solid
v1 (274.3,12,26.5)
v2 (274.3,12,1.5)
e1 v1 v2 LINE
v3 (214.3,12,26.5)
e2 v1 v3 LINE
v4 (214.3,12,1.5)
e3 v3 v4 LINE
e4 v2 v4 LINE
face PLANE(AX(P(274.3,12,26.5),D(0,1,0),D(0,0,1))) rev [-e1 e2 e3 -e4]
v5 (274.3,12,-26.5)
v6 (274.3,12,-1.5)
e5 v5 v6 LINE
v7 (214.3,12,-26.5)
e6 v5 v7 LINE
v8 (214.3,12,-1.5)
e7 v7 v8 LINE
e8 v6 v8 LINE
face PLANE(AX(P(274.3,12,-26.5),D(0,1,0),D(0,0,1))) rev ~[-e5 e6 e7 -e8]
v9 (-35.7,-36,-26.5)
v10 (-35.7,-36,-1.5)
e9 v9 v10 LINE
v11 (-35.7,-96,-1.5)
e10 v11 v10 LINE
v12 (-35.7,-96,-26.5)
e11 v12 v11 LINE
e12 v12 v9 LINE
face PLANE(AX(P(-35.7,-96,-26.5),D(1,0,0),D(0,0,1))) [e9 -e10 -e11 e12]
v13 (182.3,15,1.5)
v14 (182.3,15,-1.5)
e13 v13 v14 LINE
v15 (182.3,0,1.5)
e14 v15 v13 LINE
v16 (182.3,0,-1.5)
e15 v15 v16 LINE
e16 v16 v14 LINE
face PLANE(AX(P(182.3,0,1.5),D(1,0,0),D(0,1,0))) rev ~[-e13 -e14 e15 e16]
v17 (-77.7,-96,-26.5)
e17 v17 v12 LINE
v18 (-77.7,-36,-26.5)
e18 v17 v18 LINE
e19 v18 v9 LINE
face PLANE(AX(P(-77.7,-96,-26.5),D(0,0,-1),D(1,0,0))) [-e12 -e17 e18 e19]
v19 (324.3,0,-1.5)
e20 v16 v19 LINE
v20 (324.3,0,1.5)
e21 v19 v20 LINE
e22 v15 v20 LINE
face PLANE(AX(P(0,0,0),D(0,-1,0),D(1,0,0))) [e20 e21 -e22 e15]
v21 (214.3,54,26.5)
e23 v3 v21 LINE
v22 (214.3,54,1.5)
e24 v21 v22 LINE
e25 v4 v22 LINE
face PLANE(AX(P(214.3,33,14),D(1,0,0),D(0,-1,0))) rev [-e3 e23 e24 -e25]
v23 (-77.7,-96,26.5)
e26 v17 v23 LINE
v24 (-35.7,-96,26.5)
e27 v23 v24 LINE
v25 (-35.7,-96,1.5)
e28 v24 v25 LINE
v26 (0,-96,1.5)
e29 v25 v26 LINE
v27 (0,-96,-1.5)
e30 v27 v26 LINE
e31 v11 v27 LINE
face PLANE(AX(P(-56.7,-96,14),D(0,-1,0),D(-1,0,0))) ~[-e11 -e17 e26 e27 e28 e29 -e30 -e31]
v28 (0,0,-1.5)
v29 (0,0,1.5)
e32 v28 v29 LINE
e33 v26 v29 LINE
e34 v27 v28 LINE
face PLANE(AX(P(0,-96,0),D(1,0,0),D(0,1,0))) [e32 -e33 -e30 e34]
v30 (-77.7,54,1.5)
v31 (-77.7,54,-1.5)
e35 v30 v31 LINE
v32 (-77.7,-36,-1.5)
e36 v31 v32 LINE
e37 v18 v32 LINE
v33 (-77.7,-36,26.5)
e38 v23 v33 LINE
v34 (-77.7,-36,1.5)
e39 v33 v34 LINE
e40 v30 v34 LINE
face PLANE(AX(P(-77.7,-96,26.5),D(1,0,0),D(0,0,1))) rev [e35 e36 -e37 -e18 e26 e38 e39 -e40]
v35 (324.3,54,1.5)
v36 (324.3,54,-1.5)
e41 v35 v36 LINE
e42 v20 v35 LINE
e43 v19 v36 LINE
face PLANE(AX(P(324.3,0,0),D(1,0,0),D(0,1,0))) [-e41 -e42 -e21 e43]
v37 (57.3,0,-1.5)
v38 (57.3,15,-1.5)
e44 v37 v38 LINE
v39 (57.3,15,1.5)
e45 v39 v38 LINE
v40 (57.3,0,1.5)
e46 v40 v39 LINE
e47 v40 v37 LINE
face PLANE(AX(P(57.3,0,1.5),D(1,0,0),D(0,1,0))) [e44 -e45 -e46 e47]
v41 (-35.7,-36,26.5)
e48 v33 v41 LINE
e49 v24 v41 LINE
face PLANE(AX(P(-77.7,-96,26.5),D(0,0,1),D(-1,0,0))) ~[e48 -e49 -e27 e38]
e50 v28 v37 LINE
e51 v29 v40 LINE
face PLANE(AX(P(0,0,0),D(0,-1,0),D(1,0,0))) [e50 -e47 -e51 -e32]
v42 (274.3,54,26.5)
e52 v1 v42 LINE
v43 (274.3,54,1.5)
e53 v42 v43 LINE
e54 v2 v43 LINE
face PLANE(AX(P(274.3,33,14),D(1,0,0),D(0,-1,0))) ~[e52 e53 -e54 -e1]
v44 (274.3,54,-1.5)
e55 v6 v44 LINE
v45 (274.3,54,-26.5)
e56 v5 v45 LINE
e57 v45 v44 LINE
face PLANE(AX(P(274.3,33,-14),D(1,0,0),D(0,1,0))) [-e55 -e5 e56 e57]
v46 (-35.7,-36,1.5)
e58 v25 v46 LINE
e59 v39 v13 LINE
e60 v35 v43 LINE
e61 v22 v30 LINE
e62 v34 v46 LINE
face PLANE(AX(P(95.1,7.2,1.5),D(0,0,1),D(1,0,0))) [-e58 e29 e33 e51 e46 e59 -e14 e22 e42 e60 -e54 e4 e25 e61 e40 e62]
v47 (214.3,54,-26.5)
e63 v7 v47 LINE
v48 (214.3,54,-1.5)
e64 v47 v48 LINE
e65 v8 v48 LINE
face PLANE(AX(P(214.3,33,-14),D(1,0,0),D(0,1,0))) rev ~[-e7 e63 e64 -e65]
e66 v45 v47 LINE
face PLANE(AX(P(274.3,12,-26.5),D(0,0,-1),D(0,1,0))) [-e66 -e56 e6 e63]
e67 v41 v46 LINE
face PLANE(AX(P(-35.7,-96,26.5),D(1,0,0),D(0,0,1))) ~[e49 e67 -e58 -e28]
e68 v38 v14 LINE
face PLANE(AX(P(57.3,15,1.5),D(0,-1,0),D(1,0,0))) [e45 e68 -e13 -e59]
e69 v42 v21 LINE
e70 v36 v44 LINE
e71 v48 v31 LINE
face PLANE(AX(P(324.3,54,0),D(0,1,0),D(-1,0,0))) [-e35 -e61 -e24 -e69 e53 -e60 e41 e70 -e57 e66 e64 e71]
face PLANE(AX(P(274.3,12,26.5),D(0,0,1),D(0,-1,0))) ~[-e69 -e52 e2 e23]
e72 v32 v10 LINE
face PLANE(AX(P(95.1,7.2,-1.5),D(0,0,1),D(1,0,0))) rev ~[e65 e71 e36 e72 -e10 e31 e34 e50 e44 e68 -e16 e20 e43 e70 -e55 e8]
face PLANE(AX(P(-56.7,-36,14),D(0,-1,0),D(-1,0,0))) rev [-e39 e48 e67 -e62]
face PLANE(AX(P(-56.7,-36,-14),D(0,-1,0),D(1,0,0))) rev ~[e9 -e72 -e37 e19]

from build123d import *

# Parameters (mm, degrees)
F1_DEPTH = 1.5
F2_W     = 42
F2_H     = 25
F3_DEPTH = 60
F5_W     = 42
F5_H     = 25
F6_DEPTH = 60
F7_W     = 125
F7_H     = 15
F8_DEPTH = 25


# Not quite as in the source:
# - a pattern or mirror of a feature is missing from the dataset's text; its kind, count and spacing are read off the source's solid


with BuildPart() as f1:
    # F0 (on Top) → F1 (new body, symmetric)
    with BuildSketch(Plane.XY):
        Polygon((-77.7, -96), (0, -96), (0, 0), (324.3, 0), (324.3, 54), (-77.7, 54), align=None)
    extrude(amount=F1_DEPTH, both=True)

    # F2 (on face) → F3 (join)
    with BuildSketch(Plane.XZ.offset(96)):
        with Locations((-56.7, -14)):
            Rectangle(F2_W, F2_H)
    f3 = extrude(amount=-F3_DEPTH)

    # F3_copies: F3 across plane
    add(f3.mirror(Plane.XY))

    # F5 (on offset) → F6 (join)
    with BuildSketch(Plane.YZ.offset(274.3)):
        with Locations((33, -14)):
            Rectangle(F5_W, F5_H)
    f6 = extrude(amount=-F6_DEPTH)

    # F6_copies: F6 across plane
    add(f6.mirror(Plane.XY))

    # F7 (on face) → F8 (cut)
    with BuildSketch(Plane.XY.offset(1.5)):
        with Locations((119.8, 7.5)):
            Rectangle(F7_W, F7_H)
    extrude(amount=-F8_DEPTH, mode=Mode.SUBTRACT)


solid = f1.part
